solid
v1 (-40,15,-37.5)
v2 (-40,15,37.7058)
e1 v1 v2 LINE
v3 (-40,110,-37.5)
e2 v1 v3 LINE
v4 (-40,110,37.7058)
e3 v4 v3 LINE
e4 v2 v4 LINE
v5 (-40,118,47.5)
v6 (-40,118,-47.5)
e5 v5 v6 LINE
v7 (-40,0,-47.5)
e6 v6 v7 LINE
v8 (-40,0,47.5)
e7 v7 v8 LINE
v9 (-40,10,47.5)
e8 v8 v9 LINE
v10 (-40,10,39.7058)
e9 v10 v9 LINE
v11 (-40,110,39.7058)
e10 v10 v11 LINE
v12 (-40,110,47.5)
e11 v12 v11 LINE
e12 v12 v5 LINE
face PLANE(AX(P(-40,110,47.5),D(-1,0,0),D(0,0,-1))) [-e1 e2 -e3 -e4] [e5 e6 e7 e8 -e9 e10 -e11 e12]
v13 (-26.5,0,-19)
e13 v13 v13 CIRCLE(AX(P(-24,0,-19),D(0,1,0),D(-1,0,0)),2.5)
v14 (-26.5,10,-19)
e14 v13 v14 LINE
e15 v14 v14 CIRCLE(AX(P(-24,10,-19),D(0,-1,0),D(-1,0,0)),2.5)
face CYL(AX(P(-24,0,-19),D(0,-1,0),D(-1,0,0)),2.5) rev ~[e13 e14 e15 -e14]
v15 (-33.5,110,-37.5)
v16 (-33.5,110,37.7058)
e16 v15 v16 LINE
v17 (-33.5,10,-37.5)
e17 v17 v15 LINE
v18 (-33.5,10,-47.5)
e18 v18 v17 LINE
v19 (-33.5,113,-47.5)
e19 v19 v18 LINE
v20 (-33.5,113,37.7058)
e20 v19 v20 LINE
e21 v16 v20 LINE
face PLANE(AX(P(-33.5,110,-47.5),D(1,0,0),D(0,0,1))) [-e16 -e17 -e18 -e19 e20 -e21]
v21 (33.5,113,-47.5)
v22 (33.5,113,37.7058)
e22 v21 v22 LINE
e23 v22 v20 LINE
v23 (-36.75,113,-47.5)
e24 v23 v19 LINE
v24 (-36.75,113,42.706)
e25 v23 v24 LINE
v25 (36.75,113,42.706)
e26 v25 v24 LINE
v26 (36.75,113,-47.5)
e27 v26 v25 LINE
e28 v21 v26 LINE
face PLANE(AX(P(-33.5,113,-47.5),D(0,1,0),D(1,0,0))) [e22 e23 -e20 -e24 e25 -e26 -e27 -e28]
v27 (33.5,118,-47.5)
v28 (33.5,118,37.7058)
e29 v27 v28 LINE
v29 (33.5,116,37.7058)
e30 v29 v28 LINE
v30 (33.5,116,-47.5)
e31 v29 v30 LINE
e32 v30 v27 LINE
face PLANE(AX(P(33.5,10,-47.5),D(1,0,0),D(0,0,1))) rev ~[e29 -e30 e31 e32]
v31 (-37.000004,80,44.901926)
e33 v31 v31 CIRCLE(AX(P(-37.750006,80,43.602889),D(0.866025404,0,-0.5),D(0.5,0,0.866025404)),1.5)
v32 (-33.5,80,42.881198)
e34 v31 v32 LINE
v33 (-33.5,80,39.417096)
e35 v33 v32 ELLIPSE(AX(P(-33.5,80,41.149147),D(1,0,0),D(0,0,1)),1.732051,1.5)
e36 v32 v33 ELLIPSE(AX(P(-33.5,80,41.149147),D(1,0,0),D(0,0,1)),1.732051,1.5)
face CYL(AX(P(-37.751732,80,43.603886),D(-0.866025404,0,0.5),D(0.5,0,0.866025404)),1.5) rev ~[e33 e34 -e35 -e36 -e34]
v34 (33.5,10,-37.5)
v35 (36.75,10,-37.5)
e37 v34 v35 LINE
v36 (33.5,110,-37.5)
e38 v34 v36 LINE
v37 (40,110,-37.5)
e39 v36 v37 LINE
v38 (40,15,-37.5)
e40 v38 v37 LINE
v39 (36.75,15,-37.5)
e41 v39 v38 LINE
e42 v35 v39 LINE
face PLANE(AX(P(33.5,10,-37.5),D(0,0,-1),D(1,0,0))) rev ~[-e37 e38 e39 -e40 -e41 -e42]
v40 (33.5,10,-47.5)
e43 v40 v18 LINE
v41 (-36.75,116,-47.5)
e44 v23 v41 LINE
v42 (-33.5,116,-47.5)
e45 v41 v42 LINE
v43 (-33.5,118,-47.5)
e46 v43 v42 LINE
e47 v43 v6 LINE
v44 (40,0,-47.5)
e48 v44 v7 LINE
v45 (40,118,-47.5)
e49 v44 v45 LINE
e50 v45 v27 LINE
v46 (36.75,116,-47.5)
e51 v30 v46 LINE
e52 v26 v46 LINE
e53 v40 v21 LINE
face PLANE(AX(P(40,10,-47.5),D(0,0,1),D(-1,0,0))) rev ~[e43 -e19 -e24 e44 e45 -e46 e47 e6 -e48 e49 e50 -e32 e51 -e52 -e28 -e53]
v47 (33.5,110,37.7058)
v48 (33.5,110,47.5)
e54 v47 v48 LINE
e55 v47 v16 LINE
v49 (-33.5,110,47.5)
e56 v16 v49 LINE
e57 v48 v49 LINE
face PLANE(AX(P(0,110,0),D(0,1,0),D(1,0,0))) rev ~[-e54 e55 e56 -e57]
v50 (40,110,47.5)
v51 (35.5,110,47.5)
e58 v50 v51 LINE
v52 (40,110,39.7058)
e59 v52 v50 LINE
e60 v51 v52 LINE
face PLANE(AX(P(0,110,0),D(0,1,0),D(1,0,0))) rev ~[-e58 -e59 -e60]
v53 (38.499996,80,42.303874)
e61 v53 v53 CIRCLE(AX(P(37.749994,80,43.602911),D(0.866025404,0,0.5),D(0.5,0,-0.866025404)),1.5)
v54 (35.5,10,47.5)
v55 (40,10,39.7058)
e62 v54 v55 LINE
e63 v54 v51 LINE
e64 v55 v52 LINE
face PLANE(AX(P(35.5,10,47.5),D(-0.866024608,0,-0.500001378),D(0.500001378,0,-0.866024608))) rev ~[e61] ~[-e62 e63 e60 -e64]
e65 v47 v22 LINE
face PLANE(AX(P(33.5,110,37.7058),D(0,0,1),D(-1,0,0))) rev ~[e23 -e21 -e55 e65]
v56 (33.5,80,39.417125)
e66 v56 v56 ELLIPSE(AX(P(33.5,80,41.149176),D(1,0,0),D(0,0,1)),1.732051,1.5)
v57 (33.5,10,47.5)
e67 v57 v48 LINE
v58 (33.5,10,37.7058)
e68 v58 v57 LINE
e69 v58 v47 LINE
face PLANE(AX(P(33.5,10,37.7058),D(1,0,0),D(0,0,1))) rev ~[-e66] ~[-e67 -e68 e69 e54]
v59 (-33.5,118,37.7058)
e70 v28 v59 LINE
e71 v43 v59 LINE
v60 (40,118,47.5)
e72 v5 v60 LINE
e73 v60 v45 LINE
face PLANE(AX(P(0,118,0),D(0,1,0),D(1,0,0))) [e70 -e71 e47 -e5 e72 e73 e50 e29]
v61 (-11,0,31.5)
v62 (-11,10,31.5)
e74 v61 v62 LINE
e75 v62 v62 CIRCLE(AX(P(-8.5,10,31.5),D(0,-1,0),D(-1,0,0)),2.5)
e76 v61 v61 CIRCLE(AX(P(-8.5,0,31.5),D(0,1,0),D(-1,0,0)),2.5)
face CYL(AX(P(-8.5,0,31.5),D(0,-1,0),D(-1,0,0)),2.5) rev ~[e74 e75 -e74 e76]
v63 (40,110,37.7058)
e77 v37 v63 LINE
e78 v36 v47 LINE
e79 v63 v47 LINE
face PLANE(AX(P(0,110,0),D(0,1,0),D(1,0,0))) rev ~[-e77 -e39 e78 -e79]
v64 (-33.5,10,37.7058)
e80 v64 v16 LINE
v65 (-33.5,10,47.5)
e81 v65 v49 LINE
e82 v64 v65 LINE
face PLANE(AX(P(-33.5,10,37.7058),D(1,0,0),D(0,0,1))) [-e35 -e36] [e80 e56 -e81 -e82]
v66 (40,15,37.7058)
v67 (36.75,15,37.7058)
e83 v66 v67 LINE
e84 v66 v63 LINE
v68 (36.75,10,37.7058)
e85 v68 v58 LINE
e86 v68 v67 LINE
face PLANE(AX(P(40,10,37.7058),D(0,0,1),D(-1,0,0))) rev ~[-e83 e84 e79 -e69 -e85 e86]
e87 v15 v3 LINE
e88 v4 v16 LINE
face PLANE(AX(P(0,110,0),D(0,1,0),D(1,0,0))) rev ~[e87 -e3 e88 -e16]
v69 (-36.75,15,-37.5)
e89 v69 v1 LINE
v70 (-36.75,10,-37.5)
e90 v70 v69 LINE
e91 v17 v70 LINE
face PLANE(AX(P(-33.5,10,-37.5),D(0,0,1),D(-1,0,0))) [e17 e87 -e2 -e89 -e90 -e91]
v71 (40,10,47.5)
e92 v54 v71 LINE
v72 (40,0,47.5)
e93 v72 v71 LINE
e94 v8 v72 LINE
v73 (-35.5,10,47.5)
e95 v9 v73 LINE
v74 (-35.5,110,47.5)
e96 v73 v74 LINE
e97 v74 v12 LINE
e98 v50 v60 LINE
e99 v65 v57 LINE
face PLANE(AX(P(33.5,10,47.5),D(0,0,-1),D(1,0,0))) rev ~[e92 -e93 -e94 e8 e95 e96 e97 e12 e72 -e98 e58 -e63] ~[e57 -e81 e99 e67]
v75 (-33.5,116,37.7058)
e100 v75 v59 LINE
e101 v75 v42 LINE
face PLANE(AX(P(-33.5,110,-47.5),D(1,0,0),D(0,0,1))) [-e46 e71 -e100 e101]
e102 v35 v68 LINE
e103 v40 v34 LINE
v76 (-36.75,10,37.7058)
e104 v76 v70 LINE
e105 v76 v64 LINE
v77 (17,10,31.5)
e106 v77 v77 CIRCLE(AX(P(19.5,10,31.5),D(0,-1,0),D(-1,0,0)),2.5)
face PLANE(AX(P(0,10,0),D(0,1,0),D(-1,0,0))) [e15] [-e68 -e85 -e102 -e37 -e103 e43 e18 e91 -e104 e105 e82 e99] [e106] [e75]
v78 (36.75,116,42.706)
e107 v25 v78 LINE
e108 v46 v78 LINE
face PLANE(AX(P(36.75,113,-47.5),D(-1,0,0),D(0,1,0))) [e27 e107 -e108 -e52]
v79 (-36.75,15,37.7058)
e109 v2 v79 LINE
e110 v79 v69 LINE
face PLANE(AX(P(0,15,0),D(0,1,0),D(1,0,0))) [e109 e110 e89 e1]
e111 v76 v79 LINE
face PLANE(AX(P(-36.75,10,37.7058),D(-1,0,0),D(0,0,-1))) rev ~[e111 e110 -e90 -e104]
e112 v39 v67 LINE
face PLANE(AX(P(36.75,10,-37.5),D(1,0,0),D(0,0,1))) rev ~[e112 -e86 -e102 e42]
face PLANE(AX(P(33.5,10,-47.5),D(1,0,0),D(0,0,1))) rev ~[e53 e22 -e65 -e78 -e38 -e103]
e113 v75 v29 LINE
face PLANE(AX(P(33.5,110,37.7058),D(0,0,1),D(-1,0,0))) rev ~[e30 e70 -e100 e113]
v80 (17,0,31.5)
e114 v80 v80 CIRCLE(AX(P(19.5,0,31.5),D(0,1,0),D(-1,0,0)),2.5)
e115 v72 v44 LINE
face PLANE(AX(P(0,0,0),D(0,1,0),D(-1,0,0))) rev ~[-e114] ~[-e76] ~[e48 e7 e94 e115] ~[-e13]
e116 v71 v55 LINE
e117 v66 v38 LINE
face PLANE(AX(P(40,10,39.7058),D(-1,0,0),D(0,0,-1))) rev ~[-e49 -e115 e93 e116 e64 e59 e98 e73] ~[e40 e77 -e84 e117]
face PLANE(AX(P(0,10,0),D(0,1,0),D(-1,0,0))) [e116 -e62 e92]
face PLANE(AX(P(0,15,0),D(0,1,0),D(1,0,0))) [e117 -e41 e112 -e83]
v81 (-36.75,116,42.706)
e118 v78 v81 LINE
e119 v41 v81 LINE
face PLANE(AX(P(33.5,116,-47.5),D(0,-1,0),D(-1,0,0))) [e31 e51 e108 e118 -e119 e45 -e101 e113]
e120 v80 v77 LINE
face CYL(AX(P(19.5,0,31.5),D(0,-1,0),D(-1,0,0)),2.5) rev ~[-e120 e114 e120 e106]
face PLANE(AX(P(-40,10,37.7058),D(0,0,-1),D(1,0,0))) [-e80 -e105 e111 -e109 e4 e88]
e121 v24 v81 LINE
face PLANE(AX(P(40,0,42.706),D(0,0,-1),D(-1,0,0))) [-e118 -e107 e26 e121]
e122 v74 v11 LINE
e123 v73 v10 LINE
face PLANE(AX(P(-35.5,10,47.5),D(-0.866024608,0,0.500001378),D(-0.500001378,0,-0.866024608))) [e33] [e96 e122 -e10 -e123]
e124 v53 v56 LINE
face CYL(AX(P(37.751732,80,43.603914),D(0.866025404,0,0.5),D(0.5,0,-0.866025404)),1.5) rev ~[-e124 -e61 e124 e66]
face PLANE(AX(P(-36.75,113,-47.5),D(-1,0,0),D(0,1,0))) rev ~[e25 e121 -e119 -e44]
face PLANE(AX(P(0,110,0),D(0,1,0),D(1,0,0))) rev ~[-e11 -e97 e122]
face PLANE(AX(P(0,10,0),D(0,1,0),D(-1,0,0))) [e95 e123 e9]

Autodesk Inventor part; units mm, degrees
ref_plane "YZ Plane" through (0, 0, 0) normal (1, 0, 0) x (0, 1, 0)
ref_plane "XZ Plane" through (0, 0, 0) normal (0, 1, 0) x (-1, 0, 0)
ref_plane "XY Plane" through (0, 0, 0) normal (0, 0, 1) x (1, 0, 0)
sketch "Sketch1" plane through (0, 0, 0) normal (0, 1, 0) x (-1, 0, 0)
  line L0 (-40, -47.5) -> (40, -47.5)
  line L1 (40, -47.5) -> (40, 47.5)
  line L2 (40, 47.5) -> (-40, 47.5)
  line L3 (-40, 47.5) -> (-40, -47.5)
  line L4 (-40, -47.5) -> (40, 47.5) construction
  line L5 (40, -47.5) -> (-40, 47.5) construction
  line L6 (25.5, 17) -> (28.5, 17)
  line L7 (0, 17.5) -> (0, 19)
  line L8 (0, 0) -> (2.25, 0)
  line L9 (0, 0) -> (0, 17.5)
  line L10 (-27.5, -36.75) -> (-27.5, 38.25)
  line L11 (-27.5, 38.25) -> (28.5, -36.75) construction
  line L12 (28.5, 38.25) -> (-27.5, -36.75) construction
  line L13 (28.5, 38.25) -> (28.5, -36.75)
  line L14 (28.5, 17) -> (28.5, -36.75)
  line L15 (28.5, -36.75) -> (-27.5, -36.75)
  line L16 (0, -31.5) -> (8.5, -31.5)
  line L17 (0, 0) -> (0, -31.5)
  line L18 (0, -31.5) -> (-19.5, -31.5)
  line L19 (-19.5, -31.5) -> (-19.5, -36.75)
  line L20 (-27.5, 38.25) -> (28.5, 38.25)
  line L21 (0, 19) -> (24, 19)
  line L22 (0, 0) -> (0, 31.5)
  line L23 (28.5, -17) -> (28.5, 36.75)
  line L24 (28.5, -38.25) -> (28.5, 36.75)
  line L25 (28.5, -38.25) -> (-27.5, 36.75) construction
  line L26 (-27.5, 36.75) -> (-27.5, -38.25)
  line L27 (-27.5, -38.25) -> (28.5, 36.75) construction
  line L28 (0, 31.5) -> (8.5, 31.5)
  circle A0 centre (8.5, 31.5) radius 2.5
  line L29 (0, 31.5) -> (-19.5, 31.5)
  circle A1 centre (-19.5, 31.5) radius 2.5
  circle A2 centre (-19.5, 31.5) radius 2.5
  line L30 (-19.5, 31.5) -> (-19.5, 36.75)
  line L31 (28.5, 36.75) -> (-27.5, 36.75)
  line L32 (0, 0) -> (0, -17.5)
  line L33 (0, -17.5) -> (0, -19)
  line L34 (25.5, -17) -> (28.5, -17)
  line L35 (0, -19) -> (24, -19)
  line L36 (-27.5, -38.25) -> (28.5, -38.25)
  circle A3 centre (24, -19) radius 2.5
  point P0 (0.5, 0.75)
  point P1 (0.5, -0.75)
  dimension "d0" = 80
  dimension "d1" = 95
  dimension "d5" = 17.5
  dimension "d6" = 8.5
  dimension "d7" = 19.5
  dimension "d8" = 31.5
  dimension "d9" = 24
  dimension "d11" = 2.25
  dimension "d12" = 56
  dimension "d13" = 75
  dimension "d14" = 5.25
  dimension "d15" = 3
ref_plane "Work Plane3" through (0, 10, 0) normal (0, 1, 0) x (1, 0, 0)
sketch "Sketch2" plane through (0, 10, 0) normal (0, 1, 0) x (1, 0, 0)
  line L0 (35.5, -47.5) -> (40, -39.7058)
  line L1 (35.5, -47.5) -> (44.5, -47.5) construction
  line L2 (40, -39.7058) -> (35.5, -39.7058)
  line L3 (35.5, -39.7058) -> (35.5, -47.5)
  line L4 (-40, -47.5) -> (40, -47.5) projected
  line L5 (40, -47.5) -> (40, 47.5) projected
  line L6 (40, -37.7058) -> (33.5, -37.7058)
  line L7 (33.5, -37.7058) -> (33.5, -47.5)
  line L8 (33.5, -47.5) -> (35.5, -47.5)
  line L9 (40, -39.7058) -> (40, -37.7058)
  line L10 (0, -47.5) -> (0, 47.5)
  line L11 (-35.5, -47.5) -> (-40, -39.7058)
  line L12 (-35.5, -47.5) -> (-44.5, -47.5) construction
  line L13 (-40, -39.7058) -> (-35.5, -39.7058)
  line L14 (-35.5, -39.7058) -> (-35.5, -47.5)
  line L15 (-40, -37.7058) -> (-33.5, -37.7058)
  line L16 (-33.5, -37.7058) -> (-33.5, -47.5)
  line L17 (-33.5, -47.5) -> (-35.5, -47.5)
  line L18 (-40, -39.7058) -> (-40, -37.7058)
  line L19 (40, 47.5) -> (-40, 47.5) projected
  line L20 (-40, 47.5) -> (-33.5, 47.5)
  line L21 (-33.5, 47.5) -> (-33.5, 37.5)
  line L22 (-33.5, 37.5) -> (-40, 37.5)
  line L23 (-40, 37.5) -> (-40, 47.5)
  line L24 (40, 47.5) -> (33.5, 47.5)
  line L25 (33.5, 47.5) -> (33.5, 37.5)
  line L26 (33.5, 37.5) -> (40, 37.5)
  line L27 (40, 37.5) -> (40, 47.5)
  point P0 (0, 0)
  dimension "d18" = 9
  dimension "d19" = 60
  dimension "d20" = 2
  dimension "d21" = 9.7942
  dimension "d22" = 6.5
  dimension "d23" = 6.5
  dimension "d24" = 10
  dimension "d25" = 6.5
  dimension "d26" = 10
extrude "Extrusion2" add sketch "Sketch2" along normal blind 100 contours L3 L2 L0 | L4 L7 L6 L5 L2 L3 | L26 L25 L19 L5 | L14 L13 L18 L15 L16 L4 | L11 L13 L14 | L21 L22 L23 L19
ref_plane "Work Plane2" through (0, 10, 0) normal (0, 1, 0) x (1, 0, 0)
sketch "Sketch3" plane through (0, 10, 0) normal (0, 1, 0) x (1, 0, 0)
  line L0 (-40, 37.5) -> (-40, -37.7058) projected
  line L1 (-33.5, 37.5) -> (-40, 37.5) projected
  line L2 (-40, -37.7058) -> (-36.75, -37.7058)
  line L3 (-36.75, -37.7058) -> (-36.75, 37.5)
  line L4 (-36.75, 37.5) -> (-40, 37.5)
  line L5 (-40, 37.5) -> (-40, -37.7058)
  line L6 (33.5, 37.5) -> (40, 37.5) projected
  line L7 (40, -37.7058) -> (33.5, -37.7058) projected
  line L8 (40, 37.5) -> (36.75, 37.5)
  line L9 (36.75, 37.5) -> (36.75, -37.7058)
  line L10 (36.75, -37.7058) -> (40, -37.7058)
  line L11 (40, -37.7058) -> (40, 37.5)
  point P0 (0, 0)
extrude "Extrusion3" add sketch "Sketch3" along normal blind 5
ref_plane "Work Plane4" through (0, 110, 0) normal (0, 1, 0) x (1, 0, 0)
sketch "Sketch4" plane through (0, 110, 0) normal (0, 1, 0) x (1, 0, 0)
  line L0 (-33.5, 47.5) -> (-40, 47.5) projected
  line L1 (-40, -47.5) -> (40, -47.5) projected
  line L2 (-40, 47.5) -> (-33.5, 47.5)
  line L3 (-33.5, 47.5) -> (-33.5, -47.5)
  line L4 (-33.5, -47.5) -> (-40, -47.5)
  line L5 (-40, -47.5) -> (-40, 47.5)
  line L6 (40, 37.5) -> (40, 47.5) projected
  line L7 (40, 47.5) -> (33.5, 47.5)
  line L8 (33.5, 47.5) -> (33.5, -47.5)
  line L9 (33.5, -47.5) -> (40, -47.5)
  line L10 (40, -47.5) -> (40, 47.5)
  line L11 (40, -37.7058) -> (33.5, -37.7058) projected
  line L12 (33.5, -37.7058) -> (-33.5, -37.7058)
  line L13 (-33.5, -37.7058) -> (-33.5, -47.5)
  line L14 (-33.5, -47.5) -> (33.5, -47.5)
  line L15 (33.5, -47.5) -> (33.5, -37.7058)
  point P0 (0, 0)
extrude "Extrusion4" add sketch "Sketch4" along normal blind 8
ref_plane "Work Plane8" through (40, 0, -47.5) normal (0, 0, -1) x (-1, 0, 0)
sketch "Sketch5" plane through (40, 0, -47.5) normal (0, 0, -1) x (-1, 0, 0)
  line L0 (73.5, 110) -> (6.5, 110) projected
  line L1 (6.5, 110) -> (6.5, 113)
  line L2 (6.5, 10) -> (6.5, 118) projected
  line L3 (6.5, 113) -> (3.25, 113)
  line L4 (3.25, 113) -> (3.25, 116)
  line L5 (3.25, 116) -> (6.5, 116)
  line L6 (6.5, 116) -> (6.5, 113)
  line L7 (73.5, 10) -> (73.5, 118) projected
  line L8 (6.5, 116) -> (73.5, 116)
  line L9 (73.5, 116) -> (73.5, 113)
  line L10 (73.5, 113) -> (6.5, 113)
  line L11 (6.5, 113) -> (6.5, 116)
  line L12 (73.5, 113) -> (76.75, 113)
  line L13 (76.75, 113) -> (76.75, 116)
  line L14 (76.75, 116) -> (73.5, 116)
  line L15 (73.5, 116) -> (73.5, 113)
  point P0 (40, 0)
  dimension "d33" = 3
  dimension "d34" = 3
  dimension "d35" = 3.25
  dimension "d36" = 3.25
extrude "Extrusion5" cut sketch "Sketch5" against normal blind 90.206 contours L10 L2 L8 L7 | L7 L14 L13 L12 | L3 L4 L5 L2
ref_plane "Work Plane7" through (40, 10, 39.7058) normal (0.8660254, 0, 0.5) x (0.5, 0, -0.8660254)
sketch "Sketch6" plane through (40, 10, 39.7058) normal (0.8660254, 0, 0.5) x (0.5, 0, -0.8660254)
  line L0 (-9, 0) -> (-9, 100) projected
  line L1 (0, 0) -> (-9, 0) projected
  line L2 (-9, 100) -> (0, 100)
  line L3 (0, 100) -> (0, 0)
  line L4 (0, 0) -> (-9, 0)
  line L5 (-9, 0) -> (-9, 100)
  line L6 (0, 100) -> (0, 70)
  line L7 (0, 0) -> (0, 100) projected
  line L8 (0, 70) -> (-4.5, 70)
  circle A0 centre (-4.5, 70) radius 1.5
  point P0 (14.3862, -10)
  dimension "d39" = 30
  dimension "d40" = 3
extrude "Extrusion6" cut sketch "Sketch6" against normal blind 6 contours A0
ref_plane "Work Plane6" through (-35.5, 10, 47.5) normal (-0.8660254, 0, 0.5) x (0.5, 0, 0.8660254)
sketch "Sketch7" plane through (-35.5, 10, 47.5) normal (-0.8660254, 0, 0.5) x (0.5, 0, 0.8660254)
  line L0 (-9, 0) -> (-9, 100) projected
  line L1 (0, 0) -> (0, 100) projected
  line L2 (-9, 100) -> (0, 100)
  line L3 (0, 100) -> (0, 0)
  line L4 (0, 0) -> (-9, 0)
  line L5 (-9, 0) -> (-9, 100)
  line L6 (-9, 100) -> (-9, 70)
  line L7 (-9, 70) -> (-4.5, 70)
  circle A0 centre (-4.5, 70) radius 1.5
  point P0 (-23.3862, -10)
  dimension "d43" = 30
  dimension "d44" = 3
extrude "Extrusion7" cut sketch "Sketch7" against normal blind 6 contours A0
ref_plane "Work Plane5" through (40, 0, 47.5) normal (1, 0, 0) x (0, 0, -1)
sketch "Sketch8" plane through (40, 0, 47.5) normal (1, 0, 0) x (0, 0, -1)
  line L0 (85, 110) -> (9.7942, 110) projected
  line L1 (85, 110) -> (95, 110)
  line L2 (95, 110) -> (95, 80)
  line L3 (95, 80) -> (85, 80)
  line L4 (85, 80) -> (85, 110)
  circle A0 centre (90, 80) radius 1.5
  point P0 (47.5, 0)
  dimension "d47" = 10
  dimension "d48" = 30
  dimension "d49" = 3
extrude "Extrusion8" [suppressed]
ref_plane "Work Plane1" through (0, 0, 0) normal (0, -1, 0) x (1, 0, 0)
sketch "Sketch9" plane through (0, 0, 0) normal (0, -1, 0) x (1, 0, 0)
  line L0 (40, 47.5) -> (40, 39.7058) projected
  line L1 (40, 47.5) -> (20, 47.5)
  line L2 (20, 47.5) -> (20, -10)
  line L3 (20, -10) -> (40, -10)
  line L4 (40, -10) -> (40, 47.5)
  line L5 (-40, 47.5) -> (-35.5, 47.5) projected
  line L6 (-40, 47.5) -> (-20, 47.5)
  line L7 (-20, 47.5) -> (-20, -10)
  line L8 (-20, -10) -> (-40, -10)
  line L9 (-40, -10) -> (-40, 47.5)
  point P0 (0, 0)
  dimension "d52" = 20
  dimension "d53" = 57.5
  dimension "d54" = 20
  dimension "d55" = 57.5
extrude "Extrusion9" add sketch "Sketch1" along normal blind 10 contours L3 L2 L1 L0 | L9 L17 L18 L19 L15 L10 L31 L30 A1 L29 L22 L7 | L7 L22 L29 A1 L30 L31 L13 L34 A3 L35 L17 L9 | L35 A3 L34 L13 L15 L19 L18 L17 | L31 L10 L20 L13 | L15 L24 L36 L26
properties part number "Base"
